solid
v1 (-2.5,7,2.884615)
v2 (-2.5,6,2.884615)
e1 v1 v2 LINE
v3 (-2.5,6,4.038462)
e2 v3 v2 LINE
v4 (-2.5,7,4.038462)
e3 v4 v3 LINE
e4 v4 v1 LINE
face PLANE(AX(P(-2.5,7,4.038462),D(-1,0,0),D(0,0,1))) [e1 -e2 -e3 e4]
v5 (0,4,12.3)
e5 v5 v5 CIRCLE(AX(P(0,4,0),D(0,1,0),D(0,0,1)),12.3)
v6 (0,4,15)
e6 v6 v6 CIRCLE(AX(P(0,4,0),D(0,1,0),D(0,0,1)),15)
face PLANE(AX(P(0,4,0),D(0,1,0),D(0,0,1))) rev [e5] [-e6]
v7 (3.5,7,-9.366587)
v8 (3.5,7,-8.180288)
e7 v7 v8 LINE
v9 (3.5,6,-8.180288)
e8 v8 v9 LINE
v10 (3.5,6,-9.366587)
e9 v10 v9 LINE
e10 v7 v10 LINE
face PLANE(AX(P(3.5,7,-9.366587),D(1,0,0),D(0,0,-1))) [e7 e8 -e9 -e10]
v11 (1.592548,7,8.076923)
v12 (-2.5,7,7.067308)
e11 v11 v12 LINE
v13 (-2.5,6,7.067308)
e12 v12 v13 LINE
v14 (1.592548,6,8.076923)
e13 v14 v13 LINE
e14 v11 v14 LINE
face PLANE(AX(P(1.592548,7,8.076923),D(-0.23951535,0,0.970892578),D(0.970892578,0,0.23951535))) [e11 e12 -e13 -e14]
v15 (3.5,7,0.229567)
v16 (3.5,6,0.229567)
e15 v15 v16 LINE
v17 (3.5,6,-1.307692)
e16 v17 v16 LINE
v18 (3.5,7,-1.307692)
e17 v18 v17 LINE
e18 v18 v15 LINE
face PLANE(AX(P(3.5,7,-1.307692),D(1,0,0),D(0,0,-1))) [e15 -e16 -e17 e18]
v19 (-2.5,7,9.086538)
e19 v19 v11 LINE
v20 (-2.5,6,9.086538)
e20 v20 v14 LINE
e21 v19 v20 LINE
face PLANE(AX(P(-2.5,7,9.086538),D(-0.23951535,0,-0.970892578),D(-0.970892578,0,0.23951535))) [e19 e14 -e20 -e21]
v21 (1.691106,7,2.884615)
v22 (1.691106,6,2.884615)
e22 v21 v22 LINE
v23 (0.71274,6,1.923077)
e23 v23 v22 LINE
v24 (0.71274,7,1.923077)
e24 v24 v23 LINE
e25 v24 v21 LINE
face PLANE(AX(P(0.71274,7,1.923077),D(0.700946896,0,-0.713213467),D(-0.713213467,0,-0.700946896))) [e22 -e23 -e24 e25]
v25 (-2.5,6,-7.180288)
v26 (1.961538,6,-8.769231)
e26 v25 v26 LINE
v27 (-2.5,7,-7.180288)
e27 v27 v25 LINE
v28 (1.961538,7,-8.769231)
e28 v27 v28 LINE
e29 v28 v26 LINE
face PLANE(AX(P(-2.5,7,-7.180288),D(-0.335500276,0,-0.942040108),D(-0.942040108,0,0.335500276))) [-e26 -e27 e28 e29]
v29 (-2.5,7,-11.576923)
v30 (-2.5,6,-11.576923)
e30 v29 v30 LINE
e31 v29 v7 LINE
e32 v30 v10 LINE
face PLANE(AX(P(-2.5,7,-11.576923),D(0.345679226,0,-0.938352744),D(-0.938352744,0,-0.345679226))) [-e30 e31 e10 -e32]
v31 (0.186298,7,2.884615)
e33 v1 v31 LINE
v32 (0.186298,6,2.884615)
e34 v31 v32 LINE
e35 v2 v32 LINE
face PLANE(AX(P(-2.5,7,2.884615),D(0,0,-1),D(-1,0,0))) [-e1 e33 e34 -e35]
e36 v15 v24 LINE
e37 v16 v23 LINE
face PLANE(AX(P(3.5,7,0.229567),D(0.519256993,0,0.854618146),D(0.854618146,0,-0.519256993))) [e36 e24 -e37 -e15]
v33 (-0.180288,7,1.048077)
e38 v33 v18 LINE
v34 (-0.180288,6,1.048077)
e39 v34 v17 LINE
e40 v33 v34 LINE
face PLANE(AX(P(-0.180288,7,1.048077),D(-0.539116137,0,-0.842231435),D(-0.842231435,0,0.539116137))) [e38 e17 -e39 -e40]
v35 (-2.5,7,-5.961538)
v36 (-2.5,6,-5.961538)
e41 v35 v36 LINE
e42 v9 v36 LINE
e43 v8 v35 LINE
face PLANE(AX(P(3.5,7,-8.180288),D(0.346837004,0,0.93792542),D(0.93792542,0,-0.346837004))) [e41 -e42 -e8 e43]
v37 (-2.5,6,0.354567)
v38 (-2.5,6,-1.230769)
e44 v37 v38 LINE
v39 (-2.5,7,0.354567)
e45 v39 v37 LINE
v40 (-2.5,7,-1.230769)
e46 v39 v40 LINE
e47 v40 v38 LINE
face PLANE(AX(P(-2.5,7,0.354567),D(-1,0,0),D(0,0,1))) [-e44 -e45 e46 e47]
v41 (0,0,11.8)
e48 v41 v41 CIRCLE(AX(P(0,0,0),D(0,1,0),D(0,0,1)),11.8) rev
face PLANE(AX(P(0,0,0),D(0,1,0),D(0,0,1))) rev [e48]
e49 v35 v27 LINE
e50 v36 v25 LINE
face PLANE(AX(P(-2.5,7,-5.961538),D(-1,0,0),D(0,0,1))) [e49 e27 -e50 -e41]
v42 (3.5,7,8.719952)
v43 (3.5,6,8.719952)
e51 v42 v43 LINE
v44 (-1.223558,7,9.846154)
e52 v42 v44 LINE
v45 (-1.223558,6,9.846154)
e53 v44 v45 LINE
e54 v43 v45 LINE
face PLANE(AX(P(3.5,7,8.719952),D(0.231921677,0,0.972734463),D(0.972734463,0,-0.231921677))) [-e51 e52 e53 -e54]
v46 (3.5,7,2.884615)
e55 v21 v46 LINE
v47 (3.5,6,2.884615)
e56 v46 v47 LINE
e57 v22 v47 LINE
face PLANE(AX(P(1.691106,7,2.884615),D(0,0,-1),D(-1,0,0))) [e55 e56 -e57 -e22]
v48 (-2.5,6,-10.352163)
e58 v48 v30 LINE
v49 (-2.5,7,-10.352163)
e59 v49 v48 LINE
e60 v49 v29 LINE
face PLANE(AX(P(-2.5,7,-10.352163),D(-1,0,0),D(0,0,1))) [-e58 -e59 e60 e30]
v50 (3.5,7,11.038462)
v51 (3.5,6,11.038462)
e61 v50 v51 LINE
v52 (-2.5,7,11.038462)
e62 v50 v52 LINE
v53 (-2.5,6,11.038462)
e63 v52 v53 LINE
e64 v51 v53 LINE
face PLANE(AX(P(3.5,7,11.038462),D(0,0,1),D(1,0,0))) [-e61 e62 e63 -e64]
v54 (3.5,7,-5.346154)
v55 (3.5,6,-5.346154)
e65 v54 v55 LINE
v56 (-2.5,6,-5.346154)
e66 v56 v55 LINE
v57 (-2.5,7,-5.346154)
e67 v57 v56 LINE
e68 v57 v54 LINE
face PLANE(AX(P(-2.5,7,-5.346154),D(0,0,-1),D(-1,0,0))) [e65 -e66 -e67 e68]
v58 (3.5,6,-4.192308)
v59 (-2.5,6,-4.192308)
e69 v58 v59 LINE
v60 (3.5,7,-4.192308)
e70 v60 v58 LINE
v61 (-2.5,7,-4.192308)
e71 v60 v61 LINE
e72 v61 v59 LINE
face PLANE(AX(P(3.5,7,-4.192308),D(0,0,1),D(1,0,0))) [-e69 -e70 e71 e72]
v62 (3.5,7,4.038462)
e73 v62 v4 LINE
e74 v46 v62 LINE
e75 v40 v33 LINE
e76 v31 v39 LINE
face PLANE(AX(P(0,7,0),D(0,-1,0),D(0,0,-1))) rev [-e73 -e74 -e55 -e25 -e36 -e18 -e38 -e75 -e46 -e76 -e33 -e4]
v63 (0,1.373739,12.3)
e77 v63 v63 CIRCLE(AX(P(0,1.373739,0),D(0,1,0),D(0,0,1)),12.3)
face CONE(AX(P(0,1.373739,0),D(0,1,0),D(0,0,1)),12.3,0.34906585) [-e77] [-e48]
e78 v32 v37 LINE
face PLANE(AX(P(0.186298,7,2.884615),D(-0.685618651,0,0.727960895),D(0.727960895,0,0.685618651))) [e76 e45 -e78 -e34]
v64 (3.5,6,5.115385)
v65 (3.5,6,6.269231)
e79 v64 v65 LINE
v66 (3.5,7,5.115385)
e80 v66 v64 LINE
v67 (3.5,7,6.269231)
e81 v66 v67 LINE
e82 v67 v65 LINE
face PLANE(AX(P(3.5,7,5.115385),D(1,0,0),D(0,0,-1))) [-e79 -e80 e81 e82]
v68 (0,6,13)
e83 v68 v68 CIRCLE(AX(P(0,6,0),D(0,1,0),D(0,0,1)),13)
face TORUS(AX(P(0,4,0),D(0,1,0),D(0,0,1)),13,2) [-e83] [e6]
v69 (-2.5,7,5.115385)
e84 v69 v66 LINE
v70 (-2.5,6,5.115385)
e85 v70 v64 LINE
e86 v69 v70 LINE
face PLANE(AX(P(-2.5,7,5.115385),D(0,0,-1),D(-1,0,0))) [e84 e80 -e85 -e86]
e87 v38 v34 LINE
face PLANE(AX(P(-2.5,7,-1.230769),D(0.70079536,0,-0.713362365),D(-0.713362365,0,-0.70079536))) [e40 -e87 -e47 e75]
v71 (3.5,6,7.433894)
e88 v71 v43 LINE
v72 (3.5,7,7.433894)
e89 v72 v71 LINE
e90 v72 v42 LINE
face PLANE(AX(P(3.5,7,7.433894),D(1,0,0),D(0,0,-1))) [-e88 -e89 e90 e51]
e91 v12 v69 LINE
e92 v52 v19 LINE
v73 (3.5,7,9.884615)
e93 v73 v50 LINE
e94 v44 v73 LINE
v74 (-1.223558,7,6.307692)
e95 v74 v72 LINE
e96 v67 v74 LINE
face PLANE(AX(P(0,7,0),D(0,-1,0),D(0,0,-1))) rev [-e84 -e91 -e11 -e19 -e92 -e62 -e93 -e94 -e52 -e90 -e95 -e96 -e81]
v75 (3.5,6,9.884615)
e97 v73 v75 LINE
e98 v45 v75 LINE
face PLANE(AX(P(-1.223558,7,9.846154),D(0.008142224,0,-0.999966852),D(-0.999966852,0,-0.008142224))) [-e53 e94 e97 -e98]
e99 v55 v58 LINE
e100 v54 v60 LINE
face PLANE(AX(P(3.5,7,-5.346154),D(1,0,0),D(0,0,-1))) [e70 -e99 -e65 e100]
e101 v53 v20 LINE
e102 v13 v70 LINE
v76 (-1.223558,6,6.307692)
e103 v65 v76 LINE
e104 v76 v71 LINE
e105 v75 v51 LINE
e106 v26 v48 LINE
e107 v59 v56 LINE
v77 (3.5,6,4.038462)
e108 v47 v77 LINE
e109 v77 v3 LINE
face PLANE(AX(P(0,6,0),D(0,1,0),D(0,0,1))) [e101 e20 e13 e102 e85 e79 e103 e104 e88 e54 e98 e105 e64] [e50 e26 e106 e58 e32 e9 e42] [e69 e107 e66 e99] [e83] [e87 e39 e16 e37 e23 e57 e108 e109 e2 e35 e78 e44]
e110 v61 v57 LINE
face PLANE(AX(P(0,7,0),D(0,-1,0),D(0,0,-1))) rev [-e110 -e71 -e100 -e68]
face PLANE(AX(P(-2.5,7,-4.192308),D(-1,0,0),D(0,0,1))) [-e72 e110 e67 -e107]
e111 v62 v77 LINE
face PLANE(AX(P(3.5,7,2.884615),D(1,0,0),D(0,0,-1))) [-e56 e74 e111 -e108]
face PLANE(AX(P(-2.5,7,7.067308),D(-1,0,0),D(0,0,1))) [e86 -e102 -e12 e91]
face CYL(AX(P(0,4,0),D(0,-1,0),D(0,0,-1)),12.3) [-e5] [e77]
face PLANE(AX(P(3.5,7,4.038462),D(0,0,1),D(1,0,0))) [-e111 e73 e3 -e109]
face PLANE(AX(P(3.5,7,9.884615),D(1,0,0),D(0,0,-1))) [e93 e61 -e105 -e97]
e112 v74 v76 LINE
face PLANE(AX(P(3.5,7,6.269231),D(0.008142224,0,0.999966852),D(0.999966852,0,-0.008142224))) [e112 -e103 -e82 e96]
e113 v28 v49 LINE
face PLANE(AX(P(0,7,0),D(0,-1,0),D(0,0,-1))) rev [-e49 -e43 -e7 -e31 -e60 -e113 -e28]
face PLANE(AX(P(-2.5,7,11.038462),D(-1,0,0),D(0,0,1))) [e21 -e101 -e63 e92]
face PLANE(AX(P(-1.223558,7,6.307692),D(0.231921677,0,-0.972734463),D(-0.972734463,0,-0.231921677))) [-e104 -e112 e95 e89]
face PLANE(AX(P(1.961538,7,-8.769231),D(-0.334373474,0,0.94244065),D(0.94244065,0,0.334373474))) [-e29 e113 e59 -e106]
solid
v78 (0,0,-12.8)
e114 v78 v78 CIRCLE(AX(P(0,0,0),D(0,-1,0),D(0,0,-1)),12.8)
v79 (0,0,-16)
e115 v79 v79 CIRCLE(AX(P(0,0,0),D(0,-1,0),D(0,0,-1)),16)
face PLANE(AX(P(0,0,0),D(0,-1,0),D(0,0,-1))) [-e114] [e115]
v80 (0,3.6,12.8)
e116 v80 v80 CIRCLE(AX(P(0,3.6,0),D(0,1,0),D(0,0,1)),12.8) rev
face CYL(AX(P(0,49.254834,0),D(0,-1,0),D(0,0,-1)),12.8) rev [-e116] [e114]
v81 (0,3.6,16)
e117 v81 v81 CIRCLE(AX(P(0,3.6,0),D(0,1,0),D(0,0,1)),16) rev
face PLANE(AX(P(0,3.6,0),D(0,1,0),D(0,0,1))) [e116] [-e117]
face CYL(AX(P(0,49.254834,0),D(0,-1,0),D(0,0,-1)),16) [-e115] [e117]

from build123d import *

# Parameters (mm, degrees)
SKETCH1_R           = 12.3
BOSS_EXTRUDE1_DEPTH = 4
SKETCH2_R           = 15
BOSS_EXTRUDE2_DEPTH = 2
CHAMFER1_SIZE       = 0.5
CHAMFER1_SIZE2      = 1.37373871
SKETCH3_W           = 6
SKETCH3_H           = 1.153846154
BOSS_EXTRUDE3_DEPTH = 1
SKETCH4_R           = 16
SKETCH4_R_2         = 12.8
BOSS_EXTRUDE4_DEPTH = 3.6
FILLET1_R           = 2


with BuildPart() as part:
    # Sketch1 → Boss-Extrude1 (new body)
    with BuildSketch(Plane(origin=(0, 0, 0), x_dir=(1, 0, 0), z_dir=(0, 1, 0))):
        with Locations(Location((0, 0, 0), (0, 0, 270))):
            Circle(SKETCH1_R)
    extrude(amount=BOSS_EXTRUDE1_DEPTH)

    # Sketch2 → Boss-Extrude2 (add)
    with BuildSketch(Plane(origin=(0, 4, 0), x_dir=(1, 0, 0), z_dir=(0, 1, 0))):
        with Locations(Location((0, 0, 0), (0, 0, 270))):
            Circle(SKETCH2_R)
    extrude(amount=BOSS_EXTRUDE2_DEPTH)

    # Chamfer1
    chamfer1_edges = [part.edges().sort_by_distance(p)[0] for p in [
        (0, 0, -12.3),
    ]]
    chamfer1_side = [part.faces().sort_by_distance(p)[0] for p in [
        (0, 0, 0),
    ]]
    chamfer(chamfer1_edges, length=CHAMFER1_SIZE, length2=CHAMFER1_SIZE2, reference=chamfer1_side[0])

    # Sketch3 → Boss-Extrude3 (add)
    with BuildSketch(Plane(origin=(0, 6, 0), x_dir=(1, 0, 0), z_dir=(0, 1, 0))):
        Polygon((3.5, -11.038461538), (-2.5, -11.038461538), (-2.5, -9.086538462), (1.592548077, -8.076923077), (-2.5, -7.067307692), (-2.5, -5.115384615), (3.5, -5.115384615), (3.5, -6.269230769), (-1.223557692, -6.307692308), (3.5, -7.433894231), (3.5, -8.719951923), (-1.223557692, -9.846153846), (3.5, -9.884615385), align=None)
        Polygon((3.5, -4.038461538), (-2.5, -4.038461538), (-2.5, -2.884615385), (0.186298077, -2.884615385), (-2.5, -0.354567308), (-2.5, 1.230769231), (-0.180288462, -1.048076923), (3.5, 1.307692308), (3.5, -0.229567308), (0.712740385, -1.923076923), (1.691105769, -2.884615385), (3.5, -2.884615385), align=None)
        with Locations((0.5, 4.769230769)):
            Rectangle(SKETCH3_W, SKETCH3_H)
        Polygon((3.5, 8.180288462), (-2.5, 5.961538462), (-2.5, 7.180288462), (1.961538462, 8.769230769), (-2.5, 10.352163462), (-2.5, 11.576923077), (3.5, 9.366586538), align=None)
    extrude(amount=BOSS_EXTRUDE3_DEPTH)

    # Fillet1
    fillet1_edges = [part.edges().sort_by_distance(p)[0] for p in [
        (0, 6, -15),
    ]]
    fillet(fillet1_edges, radius=FILLET1_R - 0.0001)  # a hair under: the kernel refuses the full size


with BuildPart() as body_2:
    # Sketch4 → Boss-Extrude4 (new body)
    with BuildSketch(Plane.XZ):
        with Locations(Location((0, 0, 0), (0, 0, 270))):
            Circle(SKETCH4_R)
        with Locations(Location((0, 0, 0), (0, 0, 270))):
            Circle(SKETCH4_R_2, mode=Mode.SUBTRACT)
    extrude(amount=-BOSS_EXTRUDE4_DEPTH)


solid = Compound([part.part, body_2.part])
